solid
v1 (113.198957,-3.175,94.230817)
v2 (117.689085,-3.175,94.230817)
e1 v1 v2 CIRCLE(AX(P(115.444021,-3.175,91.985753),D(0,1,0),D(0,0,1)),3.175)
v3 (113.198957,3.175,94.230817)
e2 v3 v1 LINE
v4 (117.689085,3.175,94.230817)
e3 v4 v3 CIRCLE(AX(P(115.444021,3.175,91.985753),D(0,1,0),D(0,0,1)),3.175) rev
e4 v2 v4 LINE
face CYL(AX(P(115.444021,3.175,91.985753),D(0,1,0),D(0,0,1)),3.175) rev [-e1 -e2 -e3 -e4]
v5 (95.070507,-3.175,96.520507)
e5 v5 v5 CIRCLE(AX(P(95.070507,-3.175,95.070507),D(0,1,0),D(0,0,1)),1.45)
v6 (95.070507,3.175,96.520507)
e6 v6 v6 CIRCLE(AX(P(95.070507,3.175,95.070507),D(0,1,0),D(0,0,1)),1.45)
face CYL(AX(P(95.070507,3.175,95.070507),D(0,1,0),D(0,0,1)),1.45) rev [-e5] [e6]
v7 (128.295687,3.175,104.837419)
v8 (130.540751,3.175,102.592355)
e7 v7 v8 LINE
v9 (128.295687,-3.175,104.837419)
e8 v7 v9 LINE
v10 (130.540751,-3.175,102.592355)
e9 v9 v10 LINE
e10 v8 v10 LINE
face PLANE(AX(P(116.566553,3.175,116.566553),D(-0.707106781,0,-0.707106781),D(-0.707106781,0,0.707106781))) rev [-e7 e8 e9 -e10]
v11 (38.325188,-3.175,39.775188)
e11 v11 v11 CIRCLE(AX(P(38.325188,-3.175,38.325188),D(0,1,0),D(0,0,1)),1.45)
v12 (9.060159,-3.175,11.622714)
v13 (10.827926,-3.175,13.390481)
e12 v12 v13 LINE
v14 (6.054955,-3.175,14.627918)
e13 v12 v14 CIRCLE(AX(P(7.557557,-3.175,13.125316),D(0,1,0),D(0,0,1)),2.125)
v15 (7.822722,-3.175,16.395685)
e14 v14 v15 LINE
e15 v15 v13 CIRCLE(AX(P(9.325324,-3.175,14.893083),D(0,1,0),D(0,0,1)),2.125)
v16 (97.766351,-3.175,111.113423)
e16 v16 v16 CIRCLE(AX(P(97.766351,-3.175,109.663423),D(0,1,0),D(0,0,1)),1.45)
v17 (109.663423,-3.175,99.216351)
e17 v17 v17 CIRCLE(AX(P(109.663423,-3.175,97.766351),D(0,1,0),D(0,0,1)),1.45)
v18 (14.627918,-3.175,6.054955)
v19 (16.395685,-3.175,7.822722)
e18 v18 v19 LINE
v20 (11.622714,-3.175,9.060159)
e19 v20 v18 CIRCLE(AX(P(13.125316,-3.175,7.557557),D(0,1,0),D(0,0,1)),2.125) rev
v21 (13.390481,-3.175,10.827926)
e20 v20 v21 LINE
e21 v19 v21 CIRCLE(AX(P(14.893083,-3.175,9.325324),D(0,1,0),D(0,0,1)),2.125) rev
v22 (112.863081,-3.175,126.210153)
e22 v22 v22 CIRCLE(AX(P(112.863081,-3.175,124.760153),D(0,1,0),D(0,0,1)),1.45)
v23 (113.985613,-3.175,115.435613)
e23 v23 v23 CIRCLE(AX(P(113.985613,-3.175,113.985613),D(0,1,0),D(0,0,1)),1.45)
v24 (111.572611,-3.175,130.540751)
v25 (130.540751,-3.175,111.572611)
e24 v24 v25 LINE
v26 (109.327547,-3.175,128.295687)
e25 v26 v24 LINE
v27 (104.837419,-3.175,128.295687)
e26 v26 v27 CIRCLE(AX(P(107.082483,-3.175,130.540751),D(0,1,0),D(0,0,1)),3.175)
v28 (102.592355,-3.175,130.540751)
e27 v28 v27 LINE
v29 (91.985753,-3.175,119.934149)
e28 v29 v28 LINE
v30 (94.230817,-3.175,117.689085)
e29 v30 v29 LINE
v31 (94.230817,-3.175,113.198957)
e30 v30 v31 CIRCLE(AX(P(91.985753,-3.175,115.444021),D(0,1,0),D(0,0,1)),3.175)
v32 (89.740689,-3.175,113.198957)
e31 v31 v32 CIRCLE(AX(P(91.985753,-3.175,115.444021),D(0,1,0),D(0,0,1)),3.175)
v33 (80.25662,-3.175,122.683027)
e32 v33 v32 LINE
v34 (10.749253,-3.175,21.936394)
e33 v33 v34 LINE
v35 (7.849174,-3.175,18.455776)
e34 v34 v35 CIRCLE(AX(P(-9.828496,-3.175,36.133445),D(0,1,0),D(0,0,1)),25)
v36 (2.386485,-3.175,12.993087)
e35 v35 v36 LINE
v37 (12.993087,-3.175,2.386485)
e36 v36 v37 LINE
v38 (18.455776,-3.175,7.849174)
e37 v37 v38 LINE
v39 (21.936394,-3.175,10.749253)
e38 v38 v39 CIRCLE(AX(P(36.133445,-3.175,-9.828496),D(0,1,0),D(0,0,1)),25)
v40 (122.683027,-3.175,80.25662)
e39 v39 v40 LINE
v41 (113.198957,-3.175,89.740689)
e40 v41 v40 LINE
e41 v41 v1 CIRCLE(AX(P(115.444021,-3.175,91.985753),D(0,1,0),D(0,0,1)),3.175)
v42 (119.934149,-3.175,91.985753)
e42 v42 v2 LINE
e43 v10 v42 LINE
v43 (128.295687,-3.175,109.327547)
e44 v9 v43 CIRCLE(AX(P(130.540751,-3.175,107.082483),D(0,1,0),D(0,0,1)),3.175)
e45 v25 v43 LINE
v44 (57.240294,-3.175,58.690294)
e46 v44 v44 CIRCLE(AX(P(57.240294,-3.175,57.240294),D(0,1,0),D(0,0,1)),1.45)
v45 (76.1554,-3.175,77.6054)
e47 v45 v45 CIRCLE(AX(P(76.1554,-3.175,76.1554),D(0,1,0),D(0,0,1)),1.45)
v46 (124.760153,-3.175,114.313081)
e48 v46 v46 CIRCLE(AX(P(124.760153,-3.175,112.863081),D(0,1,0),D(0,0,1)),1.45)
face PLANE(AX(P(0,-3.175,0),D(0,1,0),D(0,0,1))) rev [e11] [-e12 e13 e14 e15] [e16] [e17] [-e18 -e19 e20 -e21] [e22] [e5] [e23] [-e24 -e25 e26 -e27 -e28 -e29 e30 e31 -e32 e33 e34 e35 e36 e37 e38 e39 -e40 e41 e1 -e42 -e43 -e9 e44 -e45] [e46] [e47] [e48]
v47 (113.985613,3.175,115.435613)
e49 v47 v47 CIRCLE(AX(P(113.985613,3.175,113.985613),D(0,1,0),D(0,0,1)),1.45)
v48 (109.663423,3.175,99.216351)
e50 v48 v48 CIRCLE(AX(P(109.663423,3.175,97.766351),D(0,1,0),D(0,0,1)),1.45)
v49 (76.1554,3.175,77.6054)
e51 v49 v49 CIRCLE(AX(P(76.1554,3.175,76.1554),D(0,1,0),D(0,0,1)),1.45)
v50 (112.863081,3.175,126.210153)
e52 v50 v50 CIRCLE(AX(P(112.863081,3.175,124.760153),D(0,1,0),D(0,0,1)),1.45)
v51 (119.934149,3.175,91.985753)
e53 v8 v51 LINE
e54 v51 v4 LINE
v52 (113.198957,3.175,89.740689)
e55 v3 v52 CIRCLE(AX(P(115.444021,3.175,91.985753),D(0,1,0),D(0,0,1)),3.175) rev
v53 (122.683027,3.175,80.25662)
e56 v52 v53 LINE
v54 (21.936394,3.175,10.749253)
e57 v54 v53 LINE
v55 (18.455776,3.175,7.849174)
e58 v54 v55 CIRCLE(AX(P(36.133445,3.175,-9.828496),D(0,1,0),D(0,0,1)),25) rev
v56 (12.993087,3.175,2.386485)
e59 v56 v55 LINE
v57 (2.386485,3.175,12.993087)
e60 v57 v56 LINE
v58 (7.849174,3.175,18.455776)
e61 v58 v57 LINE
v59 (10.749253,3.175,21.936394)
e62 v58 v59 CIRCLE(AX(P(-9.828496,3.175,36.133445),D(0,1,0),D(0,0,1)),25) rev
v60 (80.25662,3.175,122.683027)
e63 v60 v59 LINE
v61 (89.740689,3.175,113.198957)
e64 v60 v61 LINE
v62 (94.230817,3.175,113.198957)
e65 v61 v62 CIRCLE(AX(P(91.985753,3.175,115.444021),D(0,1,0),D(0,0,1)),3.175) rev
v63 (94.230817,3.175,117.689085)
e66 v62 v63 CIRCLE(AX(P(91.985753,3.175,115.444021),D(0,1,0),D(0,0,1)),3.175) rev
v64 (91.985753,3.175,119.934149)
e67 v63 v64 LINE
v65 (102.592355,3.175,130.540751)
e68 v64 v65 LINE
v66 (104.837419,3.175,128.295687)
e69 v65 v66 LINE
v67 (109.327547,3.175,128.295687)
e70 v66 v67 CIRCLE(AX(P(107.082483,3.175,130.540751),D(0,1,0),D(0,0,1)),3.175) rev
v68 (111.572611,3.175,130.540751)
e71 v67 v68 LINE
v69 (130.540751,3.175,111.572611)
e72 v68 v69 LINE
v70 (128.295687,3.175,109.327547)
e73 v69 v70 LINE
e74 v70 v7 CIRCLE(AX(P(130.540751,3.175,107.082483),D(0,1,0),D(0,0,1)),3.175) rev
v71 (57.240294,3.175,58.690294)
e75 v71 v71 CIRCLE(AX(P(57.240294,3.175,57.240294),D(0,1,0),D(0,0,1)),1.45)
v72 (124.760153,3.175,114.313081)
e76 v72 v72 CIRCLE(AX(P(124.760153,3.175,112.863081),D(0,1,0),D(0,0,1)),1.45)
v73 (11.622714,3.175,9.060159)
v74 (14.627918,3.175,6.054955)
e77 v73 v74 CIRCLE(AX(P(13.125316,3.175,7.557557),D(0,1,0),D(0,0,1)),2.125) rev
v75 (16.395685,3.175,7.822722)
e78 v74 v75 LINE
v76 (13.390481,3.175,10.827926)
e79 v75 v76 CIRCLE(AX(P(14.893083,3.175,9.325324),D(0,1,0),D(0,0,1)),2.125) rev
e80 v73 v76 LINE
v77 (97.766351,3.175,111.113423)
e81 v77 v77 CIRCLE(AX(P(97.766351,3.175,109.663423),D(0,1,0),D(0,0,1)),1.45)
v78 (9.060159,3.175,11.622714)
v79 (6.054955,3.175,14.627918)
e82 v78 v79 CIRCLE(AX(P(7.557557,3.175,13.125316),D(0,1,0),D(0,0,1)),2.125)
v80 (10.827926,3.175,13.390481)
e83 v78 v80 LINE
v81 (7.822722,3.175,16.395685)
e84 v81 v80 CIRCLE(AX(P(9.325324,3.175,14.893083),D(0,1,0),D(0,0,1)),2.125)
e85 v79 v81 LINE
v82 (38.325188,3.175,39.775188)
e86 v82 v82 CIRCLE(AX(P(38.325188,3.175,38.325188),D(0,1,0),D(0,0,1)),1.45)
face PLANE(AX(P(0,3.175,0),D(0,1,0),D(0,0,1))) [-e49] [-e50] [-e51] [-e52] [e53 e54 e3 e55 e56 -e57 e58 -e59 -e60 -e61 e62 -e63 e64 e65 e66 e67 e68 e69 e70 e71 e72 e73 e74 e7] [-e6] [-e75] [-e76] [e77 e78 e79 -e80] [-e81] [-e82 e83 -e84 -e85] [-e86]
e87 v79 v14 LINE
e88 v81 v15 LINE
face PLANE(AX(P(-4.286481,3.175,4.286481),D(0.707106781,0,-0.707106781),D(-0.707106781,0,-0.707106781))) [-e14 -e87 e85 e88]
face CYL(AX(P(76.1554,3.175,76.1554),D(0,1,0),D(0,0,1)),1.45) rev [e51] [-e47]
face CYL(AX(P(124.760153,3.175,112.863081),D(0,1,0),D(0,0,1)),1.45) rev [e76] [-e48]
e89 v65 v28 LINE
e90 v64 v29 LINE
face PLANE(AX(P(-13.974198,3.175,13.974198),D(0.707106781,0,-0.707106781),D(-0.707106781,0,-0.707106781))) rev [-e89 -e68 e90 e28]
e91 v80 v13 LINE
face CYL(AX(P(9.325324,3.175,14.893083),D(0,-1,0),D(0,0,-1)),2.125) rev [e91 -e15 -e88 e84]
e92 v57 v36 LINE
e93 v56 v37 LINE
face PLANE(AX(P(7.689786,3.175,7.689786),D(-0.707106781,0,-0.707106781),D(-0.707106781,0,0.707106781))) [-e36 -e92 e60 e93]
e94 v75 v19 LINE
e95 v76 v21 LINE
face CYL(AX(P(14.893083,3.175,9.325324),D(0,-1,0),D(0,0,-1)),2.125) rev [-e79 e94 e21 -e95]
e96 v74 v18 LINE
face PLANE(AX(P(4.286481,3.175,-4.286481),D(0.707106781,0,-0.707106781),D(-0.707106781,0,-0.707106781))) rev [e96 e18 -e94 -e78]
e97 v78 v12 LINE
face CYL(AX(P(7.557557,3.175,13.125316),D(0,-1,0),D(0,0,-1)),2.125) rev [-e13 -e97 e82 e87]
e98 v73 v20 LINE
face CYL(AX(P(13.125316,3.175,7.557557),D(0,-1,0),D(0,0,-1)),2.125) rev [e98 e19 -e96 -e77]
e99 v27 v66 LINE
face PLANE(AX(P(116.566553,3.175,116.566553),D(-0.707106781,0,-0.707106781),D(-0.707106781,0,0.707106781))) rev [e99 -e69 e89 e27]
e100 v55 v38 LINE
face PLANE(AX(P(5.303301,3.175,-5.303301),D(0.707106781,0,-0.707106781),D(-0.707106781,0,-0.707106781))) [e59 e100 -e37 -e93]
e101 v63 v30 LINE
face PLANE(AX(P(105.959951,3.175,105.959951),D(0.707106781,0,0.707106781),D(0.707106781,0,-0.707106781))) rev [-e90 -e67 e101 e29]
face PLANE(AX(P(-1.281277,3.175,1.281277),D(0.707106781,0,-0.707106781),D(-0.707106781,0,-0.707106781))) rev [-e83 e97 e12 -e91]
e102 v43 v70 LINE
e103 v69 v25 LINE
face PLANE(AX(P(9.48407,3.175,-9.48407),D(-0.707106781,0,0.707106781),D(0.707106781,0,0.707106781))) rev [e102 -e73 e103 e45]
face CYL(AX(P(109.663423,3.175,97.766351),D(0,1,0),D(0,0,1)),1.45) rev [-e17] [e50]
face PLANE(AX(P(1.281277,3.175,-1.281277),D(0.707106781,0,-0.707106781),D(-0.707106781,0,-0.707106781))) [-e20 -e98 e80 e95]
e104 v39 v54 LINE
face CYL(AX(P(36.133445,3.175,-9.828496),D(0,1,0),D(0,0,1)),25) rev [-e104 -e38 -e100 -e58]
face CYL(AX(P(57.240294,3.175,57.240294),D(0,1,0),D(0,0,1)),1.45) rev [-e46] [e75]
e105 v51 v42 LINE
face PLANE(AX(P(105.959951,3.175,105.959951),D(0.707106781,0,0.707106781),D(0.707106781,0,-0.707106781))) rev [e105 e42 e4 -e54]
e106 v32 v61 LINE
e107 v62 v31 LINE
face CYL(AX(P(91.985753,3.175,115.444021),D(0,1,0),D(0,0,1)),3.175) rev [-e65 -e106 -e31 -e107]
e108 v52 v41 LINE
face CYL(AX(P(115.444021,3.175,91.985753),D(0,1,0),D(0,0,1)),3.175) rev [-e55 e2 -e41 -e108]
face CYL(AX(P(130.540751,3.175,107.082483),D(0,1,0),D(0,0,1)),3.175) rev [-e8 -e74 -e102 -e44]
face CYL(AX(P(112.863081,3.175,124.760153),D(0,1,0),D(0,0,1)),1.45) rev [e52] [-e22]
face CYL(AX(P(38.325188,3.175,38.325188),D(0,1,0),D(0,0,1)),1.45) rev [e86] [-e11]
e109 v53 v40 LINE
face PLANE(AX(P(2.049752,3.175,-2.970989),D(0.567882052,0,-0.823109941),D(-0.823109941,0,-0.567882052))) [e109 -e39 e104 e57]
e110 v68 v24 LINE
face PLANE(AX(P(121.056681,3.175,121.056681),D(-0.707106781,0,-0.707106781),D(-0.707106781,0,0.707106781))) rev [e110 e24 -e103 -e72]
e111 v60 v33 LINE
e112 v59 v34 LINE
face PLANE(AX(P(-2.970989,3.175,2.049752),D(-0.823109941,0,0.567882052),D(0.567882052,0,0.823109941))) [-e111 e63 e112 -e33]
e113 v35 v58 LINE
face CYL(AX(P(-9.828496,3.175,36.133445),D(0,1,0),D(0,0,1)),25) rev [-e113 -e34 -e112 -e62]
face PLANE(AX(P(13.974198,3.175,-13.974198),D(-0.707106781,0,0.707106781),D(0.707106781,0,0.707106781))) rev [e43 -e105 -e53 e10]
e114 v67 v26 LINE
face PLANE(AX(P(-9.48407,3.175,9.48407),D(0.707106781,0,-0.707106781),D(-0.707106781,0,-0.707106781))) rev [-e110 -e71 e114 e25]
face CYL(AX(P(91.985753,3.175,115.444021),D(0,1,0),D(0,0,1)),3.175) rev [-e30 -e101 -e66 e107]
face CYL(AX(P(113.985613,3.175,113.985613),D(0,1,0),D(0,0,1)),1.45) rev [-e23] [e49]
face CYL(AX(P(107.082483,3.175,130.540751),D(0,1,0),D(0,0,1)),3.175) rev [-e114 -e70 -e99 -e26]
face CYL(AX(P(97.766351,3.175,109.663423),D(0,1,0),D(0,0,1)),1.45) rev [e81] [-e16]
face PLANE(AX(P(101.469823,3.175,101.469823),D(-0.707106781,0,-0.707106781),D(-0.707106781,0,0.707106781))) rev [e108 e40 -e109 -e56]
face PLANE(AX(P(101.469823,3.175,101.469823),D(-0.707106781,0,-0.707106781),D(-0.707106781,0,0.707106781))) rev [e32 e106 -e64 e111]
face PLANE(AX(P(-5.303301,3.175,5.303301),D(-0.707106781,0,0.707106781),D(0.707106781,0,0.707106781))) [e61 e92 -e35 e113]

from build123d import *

# Parameters (mm, degrees)
BOSS_EXTRUDE1_DEPTH    = 3.175
FILLET1_R              = 25
M2_5_CLEARANCE_HOLE1_D = 2.9
FILLET2_R              = 3.175


with BuildPart() as part:
    # Sketch1 → Boss-Extrude1 (new, symmetric)
    with BuildSketch(Plane(origin=(0, 0, 0), x_dir=(1, 0, 0), z_dir=(0, 1, 0))):
        Polygon((12.993087104, -2.386485387), (2.386485387, -12.993087104), (9.457553198, -20.064154916), (80.256619665, -122.683026536), (91.985753398, -110.953892803), (96.475881458, -115.444020863), (91.985753398, -119.934148924), (102.592355115, -130.540750642), (107.082483176, -126.050622581), (111.572611236, -130.540750642), (130.540750642, -111.572611236), (126.050622581, -107.082483176), (130.540750642, -102.592355115), (119.934148924, -91.985753398), (115.444020863, -96.475881458), (110.953892803, -91.985753398), (122.683026536, -80.256619665), (20.064154916, -9.457553198), align=None)
        with BuildLine():
            Line((9.060159187, -11.622714162), (10.82792614, -13.390481115))
            ThreePointArc((10.82792614, -13.390481115), (10.82792614, -16.395684935), (7.82272232, -16.395684935))
            Line((7.82272232, -16.395684935), (6.054955367, -14.627917982))
            ThreePointArc((6.054955367, -14.627917982), (6.054955367, -11.622714162), (9.060159187, -11.622714162))
        make_face(mode=Mode.SUBTRACT)
        with BuildLine():
            Line((14.627917982, -6.054955367), (16.395684935, -7.82272232))
            ThreePointArc((16.395684935, -7.82272232), (16.395684935, -10.82792614), (13.390481115, -10.82792614))
            Line((13.390481115, -10.82792614), (11.622714162, -9.060159187))
            ThreePointArc((11.622714162, -9.060159187), (11.622714162, -6.054955367), (14.627917982, -6.054955367))
        make_face(mode=Mode.SUBTRACT)
    extrude(amount=BOSS_EXTRUDE1_DEPTH, both=True)

    # Fillet1
    fillet1_edges = [part.edges().sort_by_distance(p)[0] for p in [
        (9.457553198, 0, 20.064154916),
        (20.064154916, 0, 9.457553198),
    ]]
    fillet(fillet1_edges, radius=FILLET1_R)

    # M2.5 Clearance Hole1 (through all)
    with Locations(Plane(origin=(0, 3.175, 0), x_dir=(1, 0, 0), z_dir=(0, 1, 0))):
        with Locations((97.766351334, -109.663422927), (109.663422927, -97.766351334), (112.863081112, -124.760152706), (124.760152706, -112.863081112), (38.32518754, -38.32518754), (57.240293937, -57.240293937), (76.155400334, -76.155400334), (95.070506731, -95.070506731), (113.985613127, -113.985613127)):
            Hole(M2_5_CLEARANCE_HOLE1_D / 2)

    # Fillet2
    fillet2_edges = [part.edges().sort_by_distance(p)[0] for p in [
        (110.953892803, 0, 91.985753398),
        (115.444020863, 0, 96.475881458),
        (126.050622581, 0, 107.082483176),
        (107.082483176, 0, 126.050622581),
        (96.475881458, 0, 115.444020863),
        (91.985753398, 0, 110.953892803),
    ]]
    fillet(fillet2_edges, radius=FILLET2_R - 0.0001)  # a hair under: the kernel refuses the full size


solid = part.part
